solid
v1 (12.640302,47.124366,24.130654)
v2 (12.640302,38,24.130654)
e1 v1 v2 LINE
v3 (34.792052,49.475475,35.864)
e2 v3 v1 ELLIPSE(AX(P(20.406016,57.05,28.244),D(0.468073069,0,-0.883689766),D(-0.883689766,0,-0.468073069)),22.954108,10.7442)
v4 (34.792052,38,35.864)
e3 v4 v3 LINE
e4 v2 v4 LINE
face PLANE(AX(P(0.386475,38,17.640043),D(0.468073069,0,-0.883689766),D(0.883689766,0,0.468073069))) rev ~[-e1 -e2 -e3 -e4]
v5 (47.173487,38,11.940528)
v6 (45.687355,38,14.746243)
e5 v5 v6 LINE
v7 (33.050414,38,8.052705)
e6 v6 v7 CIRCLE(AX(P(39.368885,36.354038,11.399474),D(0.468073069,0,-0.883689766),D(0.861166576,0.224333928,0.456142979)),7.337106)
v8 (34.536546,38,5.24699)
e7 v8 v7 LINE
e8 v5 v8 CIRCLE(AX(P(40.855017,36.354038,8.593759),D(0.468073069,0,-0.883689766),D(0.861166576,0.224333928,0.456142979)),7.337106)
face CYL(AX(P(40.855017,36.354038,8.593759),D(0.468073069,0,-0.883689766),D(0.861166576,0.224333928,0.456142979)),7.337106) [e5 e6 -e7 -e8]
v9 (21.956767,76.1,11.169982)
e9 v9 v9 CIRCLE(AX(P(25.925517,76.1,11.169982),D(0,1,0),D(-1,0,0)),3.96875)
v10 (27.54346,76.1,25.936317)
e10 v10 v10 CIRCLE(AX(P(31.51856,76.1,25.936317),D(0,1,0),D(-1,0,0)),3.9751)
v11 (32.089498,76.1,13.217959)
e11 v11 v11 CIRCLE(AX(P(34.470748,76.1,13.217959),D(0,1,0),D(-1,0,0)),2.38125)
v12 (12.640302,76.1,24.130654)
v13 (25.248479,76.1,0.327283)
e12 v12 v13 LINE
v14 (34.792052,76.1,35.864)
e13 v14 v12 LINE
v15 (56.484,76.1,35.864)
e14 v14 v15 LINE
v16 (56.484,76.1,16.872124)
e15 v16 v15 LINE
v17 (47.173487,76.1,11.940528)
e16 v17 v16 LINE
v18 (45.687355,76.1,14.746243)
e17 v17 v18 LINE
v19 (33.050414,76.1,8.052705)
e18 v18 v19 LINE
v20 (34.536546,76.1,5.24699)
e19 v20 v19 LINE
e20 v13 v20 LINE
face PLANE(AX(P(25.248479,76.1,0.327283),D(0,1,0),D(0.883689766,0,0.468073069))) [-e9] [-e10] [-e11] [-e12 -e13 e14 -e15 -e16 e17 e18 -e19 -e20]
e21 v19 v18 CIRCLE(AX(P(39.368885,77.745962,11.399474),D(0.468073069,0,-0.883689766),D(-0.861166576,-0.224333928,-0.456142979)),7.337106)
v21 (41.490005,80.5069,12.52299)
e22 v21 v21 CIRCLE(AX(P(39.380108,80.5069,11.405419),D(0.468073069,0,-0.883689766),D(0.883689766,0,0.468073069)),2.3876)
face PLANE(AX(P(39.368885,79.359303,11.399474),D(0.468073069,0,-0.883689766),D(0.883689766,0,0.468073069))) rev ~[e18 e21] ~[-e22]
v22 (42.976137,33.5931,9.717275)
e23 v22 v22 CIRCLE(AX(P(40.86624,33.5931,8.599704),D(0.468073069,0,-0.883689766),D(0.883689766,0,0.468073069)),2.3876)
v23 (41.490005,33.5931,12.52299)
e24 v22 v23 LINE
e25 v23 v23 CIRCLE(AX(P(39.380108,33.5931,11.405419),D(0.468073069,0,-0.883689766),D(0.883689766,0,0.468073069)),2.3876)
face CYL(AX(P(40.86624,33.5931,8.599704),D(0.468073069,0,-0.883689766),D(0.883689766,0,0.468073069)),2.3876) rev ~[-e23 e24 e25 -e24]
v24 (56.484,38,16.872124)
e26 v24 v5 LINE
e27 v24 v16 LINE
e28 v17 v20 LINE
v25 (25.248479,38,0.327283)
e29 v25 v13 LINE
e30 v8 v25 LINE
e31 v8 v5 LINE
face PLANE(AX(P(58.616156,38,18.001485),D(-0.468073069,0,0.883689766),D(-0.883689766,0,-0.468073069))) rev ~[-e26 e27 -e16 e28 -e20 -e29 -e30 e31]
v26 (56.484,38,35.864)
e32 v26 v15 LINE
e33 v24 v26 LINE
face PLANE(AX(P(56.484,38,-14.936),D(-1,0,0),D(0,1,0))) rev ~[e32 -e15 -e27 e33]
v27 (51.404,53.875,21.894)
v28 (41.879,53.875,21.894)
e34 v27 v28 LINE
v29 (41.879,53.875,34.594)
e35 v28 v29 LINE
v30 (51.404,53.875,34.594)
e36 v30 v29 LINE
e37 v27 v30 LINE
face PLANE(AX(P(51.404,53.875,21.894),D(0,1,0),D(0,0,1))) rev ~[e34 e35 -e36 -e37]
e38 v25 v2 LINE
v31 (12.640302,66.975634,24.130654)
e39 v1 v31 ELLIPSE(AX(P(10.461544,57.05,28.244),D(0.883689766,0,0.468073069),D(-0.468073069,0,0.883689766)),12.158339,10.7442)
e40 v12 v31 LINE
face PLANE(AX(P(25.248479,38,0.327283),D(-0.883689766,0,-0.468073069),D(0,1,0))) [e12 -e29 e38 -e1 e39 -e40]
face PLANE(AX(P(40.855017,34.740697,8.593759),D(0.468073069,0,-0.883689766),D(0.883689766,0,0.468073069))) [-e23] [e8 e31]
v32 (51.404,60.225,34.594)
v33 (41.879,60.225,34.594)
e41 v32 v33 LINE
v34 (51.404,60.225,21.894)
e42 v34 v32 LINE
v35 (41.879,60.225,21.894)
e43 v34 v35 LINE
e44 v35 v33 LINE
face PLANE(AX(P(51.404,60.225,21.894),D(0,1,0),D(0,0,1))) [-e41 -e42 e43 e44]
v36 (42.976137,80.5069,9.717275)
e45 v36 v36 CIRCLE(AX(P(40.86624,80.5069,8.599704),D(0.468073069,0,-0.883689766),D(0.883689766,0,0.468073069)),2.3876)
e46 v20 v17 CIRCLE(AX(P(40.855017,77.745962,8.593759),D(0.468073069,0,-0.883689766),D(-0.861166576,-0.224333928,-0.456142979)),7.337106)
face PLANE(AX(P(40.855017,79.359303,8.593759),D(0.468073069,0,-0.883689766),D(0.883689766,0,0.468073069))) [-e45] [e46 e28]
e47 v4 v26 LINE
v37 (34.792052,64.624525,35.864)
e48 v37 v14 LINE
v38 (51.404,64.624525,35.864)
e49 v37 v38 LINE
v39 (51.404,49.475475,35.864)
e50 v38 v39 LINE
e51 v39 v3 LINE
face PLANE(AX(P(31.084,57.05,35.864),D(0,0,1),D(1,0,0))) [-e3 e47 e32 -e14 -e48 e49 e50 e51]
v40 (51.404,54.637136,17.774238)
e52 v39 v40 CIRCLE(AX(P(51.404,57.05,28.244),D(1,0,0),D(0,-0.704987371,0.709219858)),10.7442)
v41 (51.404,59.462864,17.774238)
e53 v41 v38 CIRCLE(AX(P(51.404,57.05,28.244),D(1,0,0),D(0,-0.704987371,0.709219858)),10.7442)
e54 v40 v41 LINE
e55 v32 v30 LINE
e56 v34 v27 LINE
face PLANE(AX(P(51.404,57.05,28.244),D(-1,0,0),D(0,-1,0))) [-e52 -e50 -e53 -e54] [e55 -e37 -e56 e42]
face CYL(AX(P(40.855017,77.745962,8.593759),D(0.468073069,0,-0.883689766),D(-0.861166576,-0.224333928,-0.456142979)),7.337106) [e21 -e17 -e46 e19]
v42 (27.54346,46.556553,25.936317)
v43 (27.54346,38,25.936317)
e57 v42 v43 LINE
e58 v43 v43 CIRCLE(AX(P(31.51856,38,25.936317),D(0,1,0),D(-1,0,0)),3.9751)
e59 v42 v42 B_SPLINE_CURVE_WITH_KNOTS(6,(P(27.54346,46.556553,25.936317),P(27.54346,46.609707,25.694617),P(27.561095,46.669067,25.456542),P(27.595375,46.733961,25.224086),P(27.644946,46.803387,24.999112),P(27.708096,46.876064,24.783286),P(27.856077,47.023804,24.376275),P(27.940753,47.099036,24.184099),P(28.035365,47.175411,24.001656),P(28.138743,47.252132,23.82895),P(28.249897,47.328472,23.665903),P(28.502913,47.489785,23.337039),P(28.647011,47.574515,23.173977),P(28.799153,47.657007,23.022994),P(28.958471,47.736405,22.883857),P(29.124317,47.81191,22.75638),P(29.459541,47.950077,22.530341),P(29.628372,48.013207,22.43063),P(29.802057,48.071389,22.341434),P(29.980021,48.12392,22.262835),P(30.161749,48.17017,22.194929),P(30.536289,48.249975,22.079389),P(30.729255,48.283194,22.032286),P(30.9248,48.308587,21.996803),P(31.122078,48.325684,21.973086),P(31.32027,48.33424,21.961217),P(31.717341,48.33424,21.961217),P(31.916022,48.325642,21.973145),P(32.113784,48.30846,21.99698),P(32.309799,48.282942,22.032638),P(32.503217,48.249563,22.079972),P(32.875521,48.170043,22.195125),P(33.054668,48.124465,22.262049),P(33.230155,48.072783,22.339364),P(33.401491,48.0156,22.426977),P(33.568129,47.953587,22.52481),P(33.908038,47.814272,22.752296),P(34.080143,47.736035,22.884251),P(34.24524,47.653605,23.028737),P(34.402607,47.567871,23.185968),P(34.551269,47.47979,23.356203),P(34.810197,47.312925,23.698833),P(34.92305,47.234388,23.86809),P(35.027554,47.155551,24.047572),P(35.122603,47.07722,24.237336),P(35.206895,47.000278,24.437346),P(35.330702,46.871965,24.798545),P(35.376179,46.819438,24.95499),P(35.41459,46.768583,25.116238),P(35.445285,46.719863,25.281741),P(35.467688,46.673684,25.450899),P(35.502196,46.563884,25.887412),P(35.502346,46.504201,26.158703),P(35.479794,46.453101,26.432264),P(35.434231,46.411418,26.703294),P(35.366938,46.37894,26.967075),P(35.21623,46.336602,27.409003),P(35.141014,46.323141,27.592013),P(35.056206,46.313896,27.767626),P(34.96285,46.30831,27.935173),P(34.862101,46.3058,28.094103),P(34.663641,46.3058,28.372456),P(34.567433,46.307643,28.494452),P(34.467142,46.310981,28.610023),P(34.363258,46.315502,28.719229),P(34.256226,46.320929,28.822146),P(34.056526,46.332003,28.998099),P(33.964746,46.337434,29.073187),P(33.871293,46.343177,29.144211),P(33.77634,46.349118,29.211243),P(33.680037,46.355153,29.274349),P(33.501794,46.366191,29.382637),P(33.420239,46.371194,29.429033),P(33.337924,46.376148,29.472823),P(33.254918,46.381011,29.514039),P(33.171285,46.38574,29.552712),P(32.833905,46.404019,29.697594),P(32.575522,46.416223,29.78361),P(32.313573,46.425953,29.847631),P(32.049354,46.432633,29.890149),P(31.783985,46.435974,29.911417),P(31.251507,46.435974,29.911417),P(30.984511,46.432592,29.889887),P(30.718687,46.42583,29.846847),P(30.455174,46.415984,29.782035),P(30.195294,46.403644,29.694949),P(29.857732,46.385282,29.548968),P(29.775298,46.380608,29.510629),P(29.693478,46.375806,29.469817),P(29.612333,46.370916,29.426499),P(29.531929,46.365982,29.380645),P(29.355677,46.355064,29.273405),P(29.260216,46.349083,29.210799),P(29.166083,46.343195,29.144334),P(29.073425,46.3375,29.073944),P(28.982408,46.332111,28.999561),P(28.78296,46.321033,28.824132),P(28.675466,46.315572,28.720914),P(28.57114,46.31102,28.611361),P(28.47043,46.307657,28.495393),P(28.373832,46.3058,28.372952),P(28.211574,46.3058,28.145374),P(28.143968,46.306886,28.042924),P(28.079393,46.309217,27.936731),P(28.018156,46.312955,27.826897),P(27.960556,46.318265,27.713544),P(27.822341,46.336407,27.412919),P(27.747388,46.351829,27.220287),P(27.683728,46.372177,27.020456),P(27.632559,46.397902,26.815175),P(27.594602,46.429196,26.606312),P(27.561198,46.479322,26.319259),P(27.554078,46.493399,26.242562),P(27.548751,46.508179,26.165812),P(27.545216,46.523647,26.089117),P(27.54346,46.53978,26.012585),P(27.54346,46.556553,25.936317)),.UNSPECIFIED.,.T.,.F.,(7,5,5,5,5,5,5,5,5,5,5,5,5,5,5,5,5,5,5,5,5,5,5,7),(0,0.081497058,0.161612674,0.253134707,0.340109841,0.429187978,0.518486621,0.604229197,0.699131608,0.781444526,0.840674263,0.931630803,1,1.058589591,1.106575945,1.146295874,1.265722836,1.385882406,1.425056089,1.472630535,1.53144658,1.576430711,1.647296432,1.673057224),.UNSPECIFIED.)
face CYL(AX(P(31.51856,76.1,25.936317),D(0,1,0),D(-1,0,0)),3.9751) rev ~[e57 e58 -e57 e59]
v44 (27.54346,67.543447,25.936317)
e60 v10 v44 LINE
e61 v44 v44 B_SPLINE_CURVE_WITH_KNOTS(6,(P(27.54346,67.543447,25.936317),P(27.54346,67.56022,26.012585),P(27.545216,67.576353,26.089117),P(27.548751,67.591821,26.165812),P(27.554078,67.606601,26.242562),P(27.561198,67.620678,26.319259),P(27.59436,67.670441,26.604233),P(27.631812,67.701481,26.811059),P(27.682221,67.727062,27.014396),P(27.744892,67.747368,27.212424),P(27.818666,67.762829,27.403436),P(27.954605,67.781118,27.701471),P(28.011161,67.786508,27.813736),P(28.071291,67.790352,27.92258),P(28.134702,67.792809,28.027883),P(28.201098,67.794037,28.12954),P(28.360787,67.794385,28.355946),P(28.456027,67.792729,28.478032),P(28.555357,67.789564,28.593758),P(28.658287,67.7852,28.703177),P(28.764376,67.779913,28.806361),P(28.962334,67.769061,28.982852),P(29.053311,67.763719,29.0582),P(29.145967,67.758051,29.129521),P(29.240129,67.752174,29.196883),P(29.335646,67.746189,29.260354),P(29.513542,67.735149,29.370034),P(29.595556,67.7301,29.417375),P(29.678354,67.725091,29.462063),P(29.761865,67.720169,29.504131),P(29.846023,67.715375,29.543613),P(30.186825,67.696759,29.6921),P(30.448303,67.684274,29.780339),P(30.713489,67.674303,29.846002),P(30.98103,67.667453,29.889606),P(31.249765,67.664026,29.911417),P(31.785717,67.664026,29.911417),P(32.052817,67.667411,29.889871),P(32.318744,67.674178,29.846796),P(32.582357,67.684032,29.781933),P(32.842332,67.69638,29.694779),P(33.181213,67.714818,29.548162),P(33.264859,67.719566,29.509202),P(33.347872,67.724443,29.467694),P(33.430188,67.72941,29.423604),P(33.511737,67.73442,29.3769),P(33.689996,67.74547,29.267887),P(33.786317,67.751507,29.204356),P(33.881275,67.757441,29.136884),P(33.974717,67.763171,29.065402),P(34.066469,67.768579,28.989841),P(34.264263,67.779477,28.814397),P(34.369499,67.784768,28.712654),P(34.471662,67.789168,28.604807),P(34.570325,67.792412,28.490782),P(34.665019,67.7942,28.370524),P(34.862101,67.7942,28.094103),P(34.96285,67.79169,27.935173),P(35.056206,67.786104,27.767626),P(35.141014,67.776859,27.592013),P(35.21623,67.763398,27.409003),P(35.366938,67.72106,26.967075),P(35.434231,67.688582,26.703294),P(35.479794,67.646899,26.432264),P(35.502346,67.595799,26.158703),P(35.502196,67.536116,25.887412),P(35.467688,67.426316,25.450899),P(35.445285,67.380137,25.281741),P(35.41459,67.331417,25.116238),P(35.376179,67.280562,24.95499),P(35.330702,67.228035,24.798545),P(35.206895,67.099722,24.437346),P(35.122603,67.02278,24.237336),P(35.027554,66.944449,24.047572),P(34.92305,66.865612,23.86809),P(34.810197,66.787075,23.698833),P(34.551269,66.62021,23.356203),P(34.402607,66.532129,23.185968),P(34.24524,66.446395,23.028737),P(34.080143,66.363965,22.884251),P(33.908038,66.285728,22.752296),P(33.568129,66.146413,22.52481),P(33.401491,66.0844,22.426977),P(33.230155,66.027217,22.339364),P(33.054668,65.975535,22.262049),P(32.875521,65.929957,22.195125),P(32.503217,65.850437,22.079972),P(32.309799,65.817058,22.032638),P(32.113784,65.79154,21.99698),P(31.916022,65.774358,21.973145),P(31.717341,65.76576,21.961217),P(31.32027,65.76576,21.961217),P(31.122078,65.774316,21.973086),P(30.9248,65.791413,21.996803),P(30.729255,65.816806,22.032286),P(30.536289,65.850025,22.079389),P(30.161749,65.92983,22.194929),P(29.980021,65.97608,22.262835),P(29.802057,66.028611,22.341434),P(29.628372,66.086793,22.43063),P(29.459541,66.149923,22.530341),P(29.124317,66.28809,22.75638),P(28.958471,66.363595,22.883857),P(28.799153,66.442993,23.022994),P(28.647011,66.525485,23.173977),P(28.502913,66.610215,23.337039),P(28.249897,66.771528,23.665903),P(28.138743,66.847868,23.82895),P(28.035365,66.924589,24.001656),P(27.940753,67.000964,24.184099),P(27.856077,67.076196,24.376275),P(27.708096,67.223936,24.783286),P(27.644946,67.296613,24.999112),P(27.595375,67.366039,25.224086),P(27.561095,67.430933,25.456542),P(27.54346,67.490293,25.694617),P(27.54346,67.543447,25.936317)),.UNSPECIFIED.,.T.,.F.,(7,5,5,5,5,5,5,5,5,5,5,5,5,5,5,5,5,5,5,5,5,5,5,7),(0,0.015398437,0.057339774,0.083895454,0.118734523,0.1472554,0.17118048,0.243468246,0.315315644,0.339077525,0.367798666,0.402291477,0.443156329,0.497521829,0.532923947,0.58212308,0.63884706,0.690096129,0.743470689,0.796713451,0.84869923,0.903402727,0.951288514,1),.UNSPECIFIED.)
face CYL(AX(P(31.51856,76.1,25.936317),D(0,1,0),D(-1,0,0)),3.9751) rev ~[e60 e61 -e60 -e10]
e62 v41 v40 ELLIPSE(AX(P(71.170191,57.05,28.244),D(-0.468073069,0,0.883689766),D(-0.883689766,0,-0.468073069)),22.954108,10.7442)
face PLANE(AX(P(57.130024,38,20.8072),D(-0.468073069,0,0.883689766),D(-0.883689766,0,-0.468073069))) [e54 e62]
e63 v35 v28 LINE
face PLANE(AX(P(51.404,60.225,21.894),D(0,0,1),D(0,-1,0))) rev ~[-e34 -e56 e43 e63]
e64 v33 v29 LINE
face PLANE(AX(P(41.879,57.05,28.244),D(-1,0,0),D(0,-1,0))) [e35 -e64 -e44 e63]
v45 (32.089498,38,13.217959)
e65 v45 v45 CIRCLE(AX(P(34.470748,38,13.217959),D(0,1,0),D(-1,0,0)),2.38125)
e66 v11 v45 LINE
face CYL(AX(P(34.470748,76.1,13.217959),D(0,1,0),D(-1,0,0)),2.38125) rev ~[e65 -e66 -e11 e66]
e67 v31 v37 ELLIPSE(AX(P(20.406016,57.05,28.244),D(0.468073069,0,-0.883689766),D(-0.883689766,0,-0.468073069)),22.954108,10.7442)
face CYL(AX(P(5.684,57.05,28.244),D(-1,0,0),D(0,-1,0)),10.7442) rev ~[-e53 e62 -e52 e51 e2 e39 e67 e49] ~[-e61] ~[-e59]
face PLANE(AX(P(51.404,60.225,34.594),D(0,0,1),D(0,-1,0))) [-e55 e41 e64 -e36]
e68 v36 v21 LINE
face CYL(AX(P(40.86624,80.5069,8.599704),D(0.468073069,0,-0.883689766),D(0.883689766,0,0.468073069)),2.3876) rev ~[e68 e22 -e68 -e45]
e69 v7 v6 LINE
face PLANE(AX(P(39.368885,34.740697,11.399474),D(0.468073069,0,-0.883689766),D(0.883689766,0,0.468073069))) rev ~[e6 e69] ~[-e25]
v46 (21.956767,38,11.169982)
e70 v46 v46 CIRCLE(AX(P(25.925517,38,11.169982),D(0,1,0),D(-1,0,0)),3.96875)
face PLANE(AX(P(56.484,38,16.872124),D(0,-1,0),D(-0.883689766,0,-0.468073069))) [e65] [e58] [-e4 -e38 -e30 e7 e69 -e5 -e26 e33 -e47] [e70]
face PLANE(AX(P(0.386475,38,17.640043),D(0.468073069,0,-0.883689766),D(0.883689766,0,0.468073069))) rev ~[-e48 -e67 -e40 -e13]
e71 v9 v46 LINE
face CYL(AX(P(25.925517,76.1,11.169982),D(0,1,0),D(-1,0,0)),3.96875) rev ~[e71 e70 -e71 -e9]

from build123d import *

# Parameters (mm, degrees)
F0_W      = 50.8
F0_H      = 38.1
F1_DEPTH  = 50.8
F3_R      = 10.7442
F4_DEPTH  = 40.64
F5_DEPTH  = 45.72
F7_DEPTH  = 38.101
F9_W      = 6.35
F9_H      = 12.7
F10_DEPTH = 9.525
F11_DEPTH = 38.101
F13_DEPTH = 38.101
F20_R     = 2.38125
F20_R_2   = 3.96875
F20_R_3   = 3.9751
F21_DEPTH = 38.101
F22_DEPTH = 3.175
F23_R     = 2.3876
F24_DEPTH = 3.175


# Not quite as in the source:
# - a feature names something its author has since deleted; it is built from what else it names


with BuildPart() as f1:
    # F0 (on Top) → F1 (new body)
    with BuildSketch(Plane.XY):
        with Locations((25.4, -19.05)):
            Rectangle(F0_W, F0_H)
    extrude(amount=F1_DEPTH)

    # F3 (on face) → F4 (cut)
    with BuildSketch(Plane(origin=(0, 0, 0), x_dir=(0, -1, 0), z_dir=(-1, 0, 0))):
        with Locations((19.05, 43.18)):
            Circle(F3_R)
    extrude(amount=-F4_DEPTH, mode=Mode.SUBTRACT)

    # F3 (on face) → F5 (cut)
    with BuildSketch(Plane(origin=(0, 0, 0), x_dir=(0, -1, 0), z_dir=(-1, 0, 0))):
        with Locations((19.05, 43.18)):
            Circle(F3_R)
    extrude(amount=-F5_DEPTH, mode=Mode.SUBTRACT)

    # F6 (on face) → F7 (cut, through all)
    with BuildSketch(Plane.XZ.offset(38.1)):
        Polygon((-5.2975248545, 32.5760431588), (29.6258907765, 51.0742887855), (29.3069556355, 56.4961917698), (-5.2975248545, 56.4961917698), align=None)
    extrude(amount=-F7_DEPTH, mode=Mode.SUBTRACT)

    # F9 (on face) → F10 (join)
    with BuildSketch(Plane(origin=(45.72, 0, 0), x_dir=(0, -1, 0), z_dir=(-1, 0, 0))):
        with Locations((19.05, 43.18)):
            Rectangle(F9_W, F9_H)
    extrude(amount=F10_DEPTH)

    # F8 (on face) → F11 (cut, through all)
    with BuildSketch(Plane.XZ.offset(38.1)):
        Polygon((12.6081767879, 11.5786670478), (0, 35.3820377673), (-3.8052792661, 35.2523848414), (-3.8052792661, -3.7349041086), (52.9321556466, -3.7349041086), (52.9321556466, 32.9374846805), align=None)
    extrude(amount=-F11_DEPTH, mode=Mode.SUBTRACT)

    # F12 (on face) → F13 (cut, through all)
    with BuildSketch(Plane.XZ.offset(38.1)):
        Polygon((21.0712682456, 12.4185690656), (5.5156808657, 41.7864482914), (-6.4950456949, 35.4714418711), (9.0799157449, 6.0669857527), align=None)
    extrude(amount=-F13_DEPTH, mode=Mode.SUBTRACT)


with BuildPart() as f1_1:
    # F14: moved
    add(f1.part.moved(Location((12.8, 76.1, -11.5))))


with BuildPart() as f1_2:
    # F16: moved
    add(f1_1.part.moved(Location((-7.9, 0, 0))))


with BuildPart() as f1_3:
    # F17: moved
    add(f1_2.part.moved(Location((1.3, 0, -3.7))))


with BuildPart() as f1_4:
    # F18: moved
    add(f1_3.part.moved(Location((0.5, 0, -3.8))))


with BuildPart() as f1_5:
    # F19: moved
    add(f1_4.part.moved(Location((-1.016, 0, 4.064))))

    # F20 (on face) → F21 (cut, through all)
    with BuildSketch(Plane(origin=(0, 76.1, 0), x_dir=(-1, 0, 0), z_dir=(0, 1, 0))):
        with Locations((-34.4707481563, 13.2179586217)):
            Circle(F20_R)
        with Locations((-25.9255170822, 11.1699821427)):
            Circle(F20_R_2)
        with Locations((-31.5185599029, 25.9363166988)):
            Circle(F20_R_3)
    extrude(amount=-F21_DEPTH, mode=Mode.SUBTRACT)

    # F22 (add): a face of the model
    f22_faces = [f1_5.faces().sort_by_distance(p)[0] for p in [
        (40.8662395369, 57.05, 8.5997036085),
    ]]
    extrude(f22_faces, amount=-F22_DEPTH)

    # F23 (on face) → F24 (join)
    with BuildSketch(Plane(origin=(5.3963751445, 0, -10.1879851676), x_dir=(0.8836897656, 0, 0.4680730692), z_dir=(0.4680730692, 0, -0.8836897656))):
        with BuildLine():
            Line((32.9755673007, -38), (47.2757673007, -38))
            ThreePointArc((47.2757673007, -38), (40.1256673007, -29.0169325565), (32.9755673007, -38))
        make_face()
        with Locations((40.1383673007, -33.5931)):
            Circle(F23_R, mode=Mode.SUBTRACT)
        with BuildLine():
            ThreePointArc((32.9755673007, -76.1), (40.1256673007, -85.0830674435), (47.2757673007, -76.1))
            Line((47.2757673007, -76.1), (32.9755673007, -76.1))
        make_face()
        with Locations((40.1383673007, -80.5069)):
            Circle(F23_R, mode=Mode.SUBTRACT)
    extrude(amount=-F24_DEPTH)


solid = f1_5.part
